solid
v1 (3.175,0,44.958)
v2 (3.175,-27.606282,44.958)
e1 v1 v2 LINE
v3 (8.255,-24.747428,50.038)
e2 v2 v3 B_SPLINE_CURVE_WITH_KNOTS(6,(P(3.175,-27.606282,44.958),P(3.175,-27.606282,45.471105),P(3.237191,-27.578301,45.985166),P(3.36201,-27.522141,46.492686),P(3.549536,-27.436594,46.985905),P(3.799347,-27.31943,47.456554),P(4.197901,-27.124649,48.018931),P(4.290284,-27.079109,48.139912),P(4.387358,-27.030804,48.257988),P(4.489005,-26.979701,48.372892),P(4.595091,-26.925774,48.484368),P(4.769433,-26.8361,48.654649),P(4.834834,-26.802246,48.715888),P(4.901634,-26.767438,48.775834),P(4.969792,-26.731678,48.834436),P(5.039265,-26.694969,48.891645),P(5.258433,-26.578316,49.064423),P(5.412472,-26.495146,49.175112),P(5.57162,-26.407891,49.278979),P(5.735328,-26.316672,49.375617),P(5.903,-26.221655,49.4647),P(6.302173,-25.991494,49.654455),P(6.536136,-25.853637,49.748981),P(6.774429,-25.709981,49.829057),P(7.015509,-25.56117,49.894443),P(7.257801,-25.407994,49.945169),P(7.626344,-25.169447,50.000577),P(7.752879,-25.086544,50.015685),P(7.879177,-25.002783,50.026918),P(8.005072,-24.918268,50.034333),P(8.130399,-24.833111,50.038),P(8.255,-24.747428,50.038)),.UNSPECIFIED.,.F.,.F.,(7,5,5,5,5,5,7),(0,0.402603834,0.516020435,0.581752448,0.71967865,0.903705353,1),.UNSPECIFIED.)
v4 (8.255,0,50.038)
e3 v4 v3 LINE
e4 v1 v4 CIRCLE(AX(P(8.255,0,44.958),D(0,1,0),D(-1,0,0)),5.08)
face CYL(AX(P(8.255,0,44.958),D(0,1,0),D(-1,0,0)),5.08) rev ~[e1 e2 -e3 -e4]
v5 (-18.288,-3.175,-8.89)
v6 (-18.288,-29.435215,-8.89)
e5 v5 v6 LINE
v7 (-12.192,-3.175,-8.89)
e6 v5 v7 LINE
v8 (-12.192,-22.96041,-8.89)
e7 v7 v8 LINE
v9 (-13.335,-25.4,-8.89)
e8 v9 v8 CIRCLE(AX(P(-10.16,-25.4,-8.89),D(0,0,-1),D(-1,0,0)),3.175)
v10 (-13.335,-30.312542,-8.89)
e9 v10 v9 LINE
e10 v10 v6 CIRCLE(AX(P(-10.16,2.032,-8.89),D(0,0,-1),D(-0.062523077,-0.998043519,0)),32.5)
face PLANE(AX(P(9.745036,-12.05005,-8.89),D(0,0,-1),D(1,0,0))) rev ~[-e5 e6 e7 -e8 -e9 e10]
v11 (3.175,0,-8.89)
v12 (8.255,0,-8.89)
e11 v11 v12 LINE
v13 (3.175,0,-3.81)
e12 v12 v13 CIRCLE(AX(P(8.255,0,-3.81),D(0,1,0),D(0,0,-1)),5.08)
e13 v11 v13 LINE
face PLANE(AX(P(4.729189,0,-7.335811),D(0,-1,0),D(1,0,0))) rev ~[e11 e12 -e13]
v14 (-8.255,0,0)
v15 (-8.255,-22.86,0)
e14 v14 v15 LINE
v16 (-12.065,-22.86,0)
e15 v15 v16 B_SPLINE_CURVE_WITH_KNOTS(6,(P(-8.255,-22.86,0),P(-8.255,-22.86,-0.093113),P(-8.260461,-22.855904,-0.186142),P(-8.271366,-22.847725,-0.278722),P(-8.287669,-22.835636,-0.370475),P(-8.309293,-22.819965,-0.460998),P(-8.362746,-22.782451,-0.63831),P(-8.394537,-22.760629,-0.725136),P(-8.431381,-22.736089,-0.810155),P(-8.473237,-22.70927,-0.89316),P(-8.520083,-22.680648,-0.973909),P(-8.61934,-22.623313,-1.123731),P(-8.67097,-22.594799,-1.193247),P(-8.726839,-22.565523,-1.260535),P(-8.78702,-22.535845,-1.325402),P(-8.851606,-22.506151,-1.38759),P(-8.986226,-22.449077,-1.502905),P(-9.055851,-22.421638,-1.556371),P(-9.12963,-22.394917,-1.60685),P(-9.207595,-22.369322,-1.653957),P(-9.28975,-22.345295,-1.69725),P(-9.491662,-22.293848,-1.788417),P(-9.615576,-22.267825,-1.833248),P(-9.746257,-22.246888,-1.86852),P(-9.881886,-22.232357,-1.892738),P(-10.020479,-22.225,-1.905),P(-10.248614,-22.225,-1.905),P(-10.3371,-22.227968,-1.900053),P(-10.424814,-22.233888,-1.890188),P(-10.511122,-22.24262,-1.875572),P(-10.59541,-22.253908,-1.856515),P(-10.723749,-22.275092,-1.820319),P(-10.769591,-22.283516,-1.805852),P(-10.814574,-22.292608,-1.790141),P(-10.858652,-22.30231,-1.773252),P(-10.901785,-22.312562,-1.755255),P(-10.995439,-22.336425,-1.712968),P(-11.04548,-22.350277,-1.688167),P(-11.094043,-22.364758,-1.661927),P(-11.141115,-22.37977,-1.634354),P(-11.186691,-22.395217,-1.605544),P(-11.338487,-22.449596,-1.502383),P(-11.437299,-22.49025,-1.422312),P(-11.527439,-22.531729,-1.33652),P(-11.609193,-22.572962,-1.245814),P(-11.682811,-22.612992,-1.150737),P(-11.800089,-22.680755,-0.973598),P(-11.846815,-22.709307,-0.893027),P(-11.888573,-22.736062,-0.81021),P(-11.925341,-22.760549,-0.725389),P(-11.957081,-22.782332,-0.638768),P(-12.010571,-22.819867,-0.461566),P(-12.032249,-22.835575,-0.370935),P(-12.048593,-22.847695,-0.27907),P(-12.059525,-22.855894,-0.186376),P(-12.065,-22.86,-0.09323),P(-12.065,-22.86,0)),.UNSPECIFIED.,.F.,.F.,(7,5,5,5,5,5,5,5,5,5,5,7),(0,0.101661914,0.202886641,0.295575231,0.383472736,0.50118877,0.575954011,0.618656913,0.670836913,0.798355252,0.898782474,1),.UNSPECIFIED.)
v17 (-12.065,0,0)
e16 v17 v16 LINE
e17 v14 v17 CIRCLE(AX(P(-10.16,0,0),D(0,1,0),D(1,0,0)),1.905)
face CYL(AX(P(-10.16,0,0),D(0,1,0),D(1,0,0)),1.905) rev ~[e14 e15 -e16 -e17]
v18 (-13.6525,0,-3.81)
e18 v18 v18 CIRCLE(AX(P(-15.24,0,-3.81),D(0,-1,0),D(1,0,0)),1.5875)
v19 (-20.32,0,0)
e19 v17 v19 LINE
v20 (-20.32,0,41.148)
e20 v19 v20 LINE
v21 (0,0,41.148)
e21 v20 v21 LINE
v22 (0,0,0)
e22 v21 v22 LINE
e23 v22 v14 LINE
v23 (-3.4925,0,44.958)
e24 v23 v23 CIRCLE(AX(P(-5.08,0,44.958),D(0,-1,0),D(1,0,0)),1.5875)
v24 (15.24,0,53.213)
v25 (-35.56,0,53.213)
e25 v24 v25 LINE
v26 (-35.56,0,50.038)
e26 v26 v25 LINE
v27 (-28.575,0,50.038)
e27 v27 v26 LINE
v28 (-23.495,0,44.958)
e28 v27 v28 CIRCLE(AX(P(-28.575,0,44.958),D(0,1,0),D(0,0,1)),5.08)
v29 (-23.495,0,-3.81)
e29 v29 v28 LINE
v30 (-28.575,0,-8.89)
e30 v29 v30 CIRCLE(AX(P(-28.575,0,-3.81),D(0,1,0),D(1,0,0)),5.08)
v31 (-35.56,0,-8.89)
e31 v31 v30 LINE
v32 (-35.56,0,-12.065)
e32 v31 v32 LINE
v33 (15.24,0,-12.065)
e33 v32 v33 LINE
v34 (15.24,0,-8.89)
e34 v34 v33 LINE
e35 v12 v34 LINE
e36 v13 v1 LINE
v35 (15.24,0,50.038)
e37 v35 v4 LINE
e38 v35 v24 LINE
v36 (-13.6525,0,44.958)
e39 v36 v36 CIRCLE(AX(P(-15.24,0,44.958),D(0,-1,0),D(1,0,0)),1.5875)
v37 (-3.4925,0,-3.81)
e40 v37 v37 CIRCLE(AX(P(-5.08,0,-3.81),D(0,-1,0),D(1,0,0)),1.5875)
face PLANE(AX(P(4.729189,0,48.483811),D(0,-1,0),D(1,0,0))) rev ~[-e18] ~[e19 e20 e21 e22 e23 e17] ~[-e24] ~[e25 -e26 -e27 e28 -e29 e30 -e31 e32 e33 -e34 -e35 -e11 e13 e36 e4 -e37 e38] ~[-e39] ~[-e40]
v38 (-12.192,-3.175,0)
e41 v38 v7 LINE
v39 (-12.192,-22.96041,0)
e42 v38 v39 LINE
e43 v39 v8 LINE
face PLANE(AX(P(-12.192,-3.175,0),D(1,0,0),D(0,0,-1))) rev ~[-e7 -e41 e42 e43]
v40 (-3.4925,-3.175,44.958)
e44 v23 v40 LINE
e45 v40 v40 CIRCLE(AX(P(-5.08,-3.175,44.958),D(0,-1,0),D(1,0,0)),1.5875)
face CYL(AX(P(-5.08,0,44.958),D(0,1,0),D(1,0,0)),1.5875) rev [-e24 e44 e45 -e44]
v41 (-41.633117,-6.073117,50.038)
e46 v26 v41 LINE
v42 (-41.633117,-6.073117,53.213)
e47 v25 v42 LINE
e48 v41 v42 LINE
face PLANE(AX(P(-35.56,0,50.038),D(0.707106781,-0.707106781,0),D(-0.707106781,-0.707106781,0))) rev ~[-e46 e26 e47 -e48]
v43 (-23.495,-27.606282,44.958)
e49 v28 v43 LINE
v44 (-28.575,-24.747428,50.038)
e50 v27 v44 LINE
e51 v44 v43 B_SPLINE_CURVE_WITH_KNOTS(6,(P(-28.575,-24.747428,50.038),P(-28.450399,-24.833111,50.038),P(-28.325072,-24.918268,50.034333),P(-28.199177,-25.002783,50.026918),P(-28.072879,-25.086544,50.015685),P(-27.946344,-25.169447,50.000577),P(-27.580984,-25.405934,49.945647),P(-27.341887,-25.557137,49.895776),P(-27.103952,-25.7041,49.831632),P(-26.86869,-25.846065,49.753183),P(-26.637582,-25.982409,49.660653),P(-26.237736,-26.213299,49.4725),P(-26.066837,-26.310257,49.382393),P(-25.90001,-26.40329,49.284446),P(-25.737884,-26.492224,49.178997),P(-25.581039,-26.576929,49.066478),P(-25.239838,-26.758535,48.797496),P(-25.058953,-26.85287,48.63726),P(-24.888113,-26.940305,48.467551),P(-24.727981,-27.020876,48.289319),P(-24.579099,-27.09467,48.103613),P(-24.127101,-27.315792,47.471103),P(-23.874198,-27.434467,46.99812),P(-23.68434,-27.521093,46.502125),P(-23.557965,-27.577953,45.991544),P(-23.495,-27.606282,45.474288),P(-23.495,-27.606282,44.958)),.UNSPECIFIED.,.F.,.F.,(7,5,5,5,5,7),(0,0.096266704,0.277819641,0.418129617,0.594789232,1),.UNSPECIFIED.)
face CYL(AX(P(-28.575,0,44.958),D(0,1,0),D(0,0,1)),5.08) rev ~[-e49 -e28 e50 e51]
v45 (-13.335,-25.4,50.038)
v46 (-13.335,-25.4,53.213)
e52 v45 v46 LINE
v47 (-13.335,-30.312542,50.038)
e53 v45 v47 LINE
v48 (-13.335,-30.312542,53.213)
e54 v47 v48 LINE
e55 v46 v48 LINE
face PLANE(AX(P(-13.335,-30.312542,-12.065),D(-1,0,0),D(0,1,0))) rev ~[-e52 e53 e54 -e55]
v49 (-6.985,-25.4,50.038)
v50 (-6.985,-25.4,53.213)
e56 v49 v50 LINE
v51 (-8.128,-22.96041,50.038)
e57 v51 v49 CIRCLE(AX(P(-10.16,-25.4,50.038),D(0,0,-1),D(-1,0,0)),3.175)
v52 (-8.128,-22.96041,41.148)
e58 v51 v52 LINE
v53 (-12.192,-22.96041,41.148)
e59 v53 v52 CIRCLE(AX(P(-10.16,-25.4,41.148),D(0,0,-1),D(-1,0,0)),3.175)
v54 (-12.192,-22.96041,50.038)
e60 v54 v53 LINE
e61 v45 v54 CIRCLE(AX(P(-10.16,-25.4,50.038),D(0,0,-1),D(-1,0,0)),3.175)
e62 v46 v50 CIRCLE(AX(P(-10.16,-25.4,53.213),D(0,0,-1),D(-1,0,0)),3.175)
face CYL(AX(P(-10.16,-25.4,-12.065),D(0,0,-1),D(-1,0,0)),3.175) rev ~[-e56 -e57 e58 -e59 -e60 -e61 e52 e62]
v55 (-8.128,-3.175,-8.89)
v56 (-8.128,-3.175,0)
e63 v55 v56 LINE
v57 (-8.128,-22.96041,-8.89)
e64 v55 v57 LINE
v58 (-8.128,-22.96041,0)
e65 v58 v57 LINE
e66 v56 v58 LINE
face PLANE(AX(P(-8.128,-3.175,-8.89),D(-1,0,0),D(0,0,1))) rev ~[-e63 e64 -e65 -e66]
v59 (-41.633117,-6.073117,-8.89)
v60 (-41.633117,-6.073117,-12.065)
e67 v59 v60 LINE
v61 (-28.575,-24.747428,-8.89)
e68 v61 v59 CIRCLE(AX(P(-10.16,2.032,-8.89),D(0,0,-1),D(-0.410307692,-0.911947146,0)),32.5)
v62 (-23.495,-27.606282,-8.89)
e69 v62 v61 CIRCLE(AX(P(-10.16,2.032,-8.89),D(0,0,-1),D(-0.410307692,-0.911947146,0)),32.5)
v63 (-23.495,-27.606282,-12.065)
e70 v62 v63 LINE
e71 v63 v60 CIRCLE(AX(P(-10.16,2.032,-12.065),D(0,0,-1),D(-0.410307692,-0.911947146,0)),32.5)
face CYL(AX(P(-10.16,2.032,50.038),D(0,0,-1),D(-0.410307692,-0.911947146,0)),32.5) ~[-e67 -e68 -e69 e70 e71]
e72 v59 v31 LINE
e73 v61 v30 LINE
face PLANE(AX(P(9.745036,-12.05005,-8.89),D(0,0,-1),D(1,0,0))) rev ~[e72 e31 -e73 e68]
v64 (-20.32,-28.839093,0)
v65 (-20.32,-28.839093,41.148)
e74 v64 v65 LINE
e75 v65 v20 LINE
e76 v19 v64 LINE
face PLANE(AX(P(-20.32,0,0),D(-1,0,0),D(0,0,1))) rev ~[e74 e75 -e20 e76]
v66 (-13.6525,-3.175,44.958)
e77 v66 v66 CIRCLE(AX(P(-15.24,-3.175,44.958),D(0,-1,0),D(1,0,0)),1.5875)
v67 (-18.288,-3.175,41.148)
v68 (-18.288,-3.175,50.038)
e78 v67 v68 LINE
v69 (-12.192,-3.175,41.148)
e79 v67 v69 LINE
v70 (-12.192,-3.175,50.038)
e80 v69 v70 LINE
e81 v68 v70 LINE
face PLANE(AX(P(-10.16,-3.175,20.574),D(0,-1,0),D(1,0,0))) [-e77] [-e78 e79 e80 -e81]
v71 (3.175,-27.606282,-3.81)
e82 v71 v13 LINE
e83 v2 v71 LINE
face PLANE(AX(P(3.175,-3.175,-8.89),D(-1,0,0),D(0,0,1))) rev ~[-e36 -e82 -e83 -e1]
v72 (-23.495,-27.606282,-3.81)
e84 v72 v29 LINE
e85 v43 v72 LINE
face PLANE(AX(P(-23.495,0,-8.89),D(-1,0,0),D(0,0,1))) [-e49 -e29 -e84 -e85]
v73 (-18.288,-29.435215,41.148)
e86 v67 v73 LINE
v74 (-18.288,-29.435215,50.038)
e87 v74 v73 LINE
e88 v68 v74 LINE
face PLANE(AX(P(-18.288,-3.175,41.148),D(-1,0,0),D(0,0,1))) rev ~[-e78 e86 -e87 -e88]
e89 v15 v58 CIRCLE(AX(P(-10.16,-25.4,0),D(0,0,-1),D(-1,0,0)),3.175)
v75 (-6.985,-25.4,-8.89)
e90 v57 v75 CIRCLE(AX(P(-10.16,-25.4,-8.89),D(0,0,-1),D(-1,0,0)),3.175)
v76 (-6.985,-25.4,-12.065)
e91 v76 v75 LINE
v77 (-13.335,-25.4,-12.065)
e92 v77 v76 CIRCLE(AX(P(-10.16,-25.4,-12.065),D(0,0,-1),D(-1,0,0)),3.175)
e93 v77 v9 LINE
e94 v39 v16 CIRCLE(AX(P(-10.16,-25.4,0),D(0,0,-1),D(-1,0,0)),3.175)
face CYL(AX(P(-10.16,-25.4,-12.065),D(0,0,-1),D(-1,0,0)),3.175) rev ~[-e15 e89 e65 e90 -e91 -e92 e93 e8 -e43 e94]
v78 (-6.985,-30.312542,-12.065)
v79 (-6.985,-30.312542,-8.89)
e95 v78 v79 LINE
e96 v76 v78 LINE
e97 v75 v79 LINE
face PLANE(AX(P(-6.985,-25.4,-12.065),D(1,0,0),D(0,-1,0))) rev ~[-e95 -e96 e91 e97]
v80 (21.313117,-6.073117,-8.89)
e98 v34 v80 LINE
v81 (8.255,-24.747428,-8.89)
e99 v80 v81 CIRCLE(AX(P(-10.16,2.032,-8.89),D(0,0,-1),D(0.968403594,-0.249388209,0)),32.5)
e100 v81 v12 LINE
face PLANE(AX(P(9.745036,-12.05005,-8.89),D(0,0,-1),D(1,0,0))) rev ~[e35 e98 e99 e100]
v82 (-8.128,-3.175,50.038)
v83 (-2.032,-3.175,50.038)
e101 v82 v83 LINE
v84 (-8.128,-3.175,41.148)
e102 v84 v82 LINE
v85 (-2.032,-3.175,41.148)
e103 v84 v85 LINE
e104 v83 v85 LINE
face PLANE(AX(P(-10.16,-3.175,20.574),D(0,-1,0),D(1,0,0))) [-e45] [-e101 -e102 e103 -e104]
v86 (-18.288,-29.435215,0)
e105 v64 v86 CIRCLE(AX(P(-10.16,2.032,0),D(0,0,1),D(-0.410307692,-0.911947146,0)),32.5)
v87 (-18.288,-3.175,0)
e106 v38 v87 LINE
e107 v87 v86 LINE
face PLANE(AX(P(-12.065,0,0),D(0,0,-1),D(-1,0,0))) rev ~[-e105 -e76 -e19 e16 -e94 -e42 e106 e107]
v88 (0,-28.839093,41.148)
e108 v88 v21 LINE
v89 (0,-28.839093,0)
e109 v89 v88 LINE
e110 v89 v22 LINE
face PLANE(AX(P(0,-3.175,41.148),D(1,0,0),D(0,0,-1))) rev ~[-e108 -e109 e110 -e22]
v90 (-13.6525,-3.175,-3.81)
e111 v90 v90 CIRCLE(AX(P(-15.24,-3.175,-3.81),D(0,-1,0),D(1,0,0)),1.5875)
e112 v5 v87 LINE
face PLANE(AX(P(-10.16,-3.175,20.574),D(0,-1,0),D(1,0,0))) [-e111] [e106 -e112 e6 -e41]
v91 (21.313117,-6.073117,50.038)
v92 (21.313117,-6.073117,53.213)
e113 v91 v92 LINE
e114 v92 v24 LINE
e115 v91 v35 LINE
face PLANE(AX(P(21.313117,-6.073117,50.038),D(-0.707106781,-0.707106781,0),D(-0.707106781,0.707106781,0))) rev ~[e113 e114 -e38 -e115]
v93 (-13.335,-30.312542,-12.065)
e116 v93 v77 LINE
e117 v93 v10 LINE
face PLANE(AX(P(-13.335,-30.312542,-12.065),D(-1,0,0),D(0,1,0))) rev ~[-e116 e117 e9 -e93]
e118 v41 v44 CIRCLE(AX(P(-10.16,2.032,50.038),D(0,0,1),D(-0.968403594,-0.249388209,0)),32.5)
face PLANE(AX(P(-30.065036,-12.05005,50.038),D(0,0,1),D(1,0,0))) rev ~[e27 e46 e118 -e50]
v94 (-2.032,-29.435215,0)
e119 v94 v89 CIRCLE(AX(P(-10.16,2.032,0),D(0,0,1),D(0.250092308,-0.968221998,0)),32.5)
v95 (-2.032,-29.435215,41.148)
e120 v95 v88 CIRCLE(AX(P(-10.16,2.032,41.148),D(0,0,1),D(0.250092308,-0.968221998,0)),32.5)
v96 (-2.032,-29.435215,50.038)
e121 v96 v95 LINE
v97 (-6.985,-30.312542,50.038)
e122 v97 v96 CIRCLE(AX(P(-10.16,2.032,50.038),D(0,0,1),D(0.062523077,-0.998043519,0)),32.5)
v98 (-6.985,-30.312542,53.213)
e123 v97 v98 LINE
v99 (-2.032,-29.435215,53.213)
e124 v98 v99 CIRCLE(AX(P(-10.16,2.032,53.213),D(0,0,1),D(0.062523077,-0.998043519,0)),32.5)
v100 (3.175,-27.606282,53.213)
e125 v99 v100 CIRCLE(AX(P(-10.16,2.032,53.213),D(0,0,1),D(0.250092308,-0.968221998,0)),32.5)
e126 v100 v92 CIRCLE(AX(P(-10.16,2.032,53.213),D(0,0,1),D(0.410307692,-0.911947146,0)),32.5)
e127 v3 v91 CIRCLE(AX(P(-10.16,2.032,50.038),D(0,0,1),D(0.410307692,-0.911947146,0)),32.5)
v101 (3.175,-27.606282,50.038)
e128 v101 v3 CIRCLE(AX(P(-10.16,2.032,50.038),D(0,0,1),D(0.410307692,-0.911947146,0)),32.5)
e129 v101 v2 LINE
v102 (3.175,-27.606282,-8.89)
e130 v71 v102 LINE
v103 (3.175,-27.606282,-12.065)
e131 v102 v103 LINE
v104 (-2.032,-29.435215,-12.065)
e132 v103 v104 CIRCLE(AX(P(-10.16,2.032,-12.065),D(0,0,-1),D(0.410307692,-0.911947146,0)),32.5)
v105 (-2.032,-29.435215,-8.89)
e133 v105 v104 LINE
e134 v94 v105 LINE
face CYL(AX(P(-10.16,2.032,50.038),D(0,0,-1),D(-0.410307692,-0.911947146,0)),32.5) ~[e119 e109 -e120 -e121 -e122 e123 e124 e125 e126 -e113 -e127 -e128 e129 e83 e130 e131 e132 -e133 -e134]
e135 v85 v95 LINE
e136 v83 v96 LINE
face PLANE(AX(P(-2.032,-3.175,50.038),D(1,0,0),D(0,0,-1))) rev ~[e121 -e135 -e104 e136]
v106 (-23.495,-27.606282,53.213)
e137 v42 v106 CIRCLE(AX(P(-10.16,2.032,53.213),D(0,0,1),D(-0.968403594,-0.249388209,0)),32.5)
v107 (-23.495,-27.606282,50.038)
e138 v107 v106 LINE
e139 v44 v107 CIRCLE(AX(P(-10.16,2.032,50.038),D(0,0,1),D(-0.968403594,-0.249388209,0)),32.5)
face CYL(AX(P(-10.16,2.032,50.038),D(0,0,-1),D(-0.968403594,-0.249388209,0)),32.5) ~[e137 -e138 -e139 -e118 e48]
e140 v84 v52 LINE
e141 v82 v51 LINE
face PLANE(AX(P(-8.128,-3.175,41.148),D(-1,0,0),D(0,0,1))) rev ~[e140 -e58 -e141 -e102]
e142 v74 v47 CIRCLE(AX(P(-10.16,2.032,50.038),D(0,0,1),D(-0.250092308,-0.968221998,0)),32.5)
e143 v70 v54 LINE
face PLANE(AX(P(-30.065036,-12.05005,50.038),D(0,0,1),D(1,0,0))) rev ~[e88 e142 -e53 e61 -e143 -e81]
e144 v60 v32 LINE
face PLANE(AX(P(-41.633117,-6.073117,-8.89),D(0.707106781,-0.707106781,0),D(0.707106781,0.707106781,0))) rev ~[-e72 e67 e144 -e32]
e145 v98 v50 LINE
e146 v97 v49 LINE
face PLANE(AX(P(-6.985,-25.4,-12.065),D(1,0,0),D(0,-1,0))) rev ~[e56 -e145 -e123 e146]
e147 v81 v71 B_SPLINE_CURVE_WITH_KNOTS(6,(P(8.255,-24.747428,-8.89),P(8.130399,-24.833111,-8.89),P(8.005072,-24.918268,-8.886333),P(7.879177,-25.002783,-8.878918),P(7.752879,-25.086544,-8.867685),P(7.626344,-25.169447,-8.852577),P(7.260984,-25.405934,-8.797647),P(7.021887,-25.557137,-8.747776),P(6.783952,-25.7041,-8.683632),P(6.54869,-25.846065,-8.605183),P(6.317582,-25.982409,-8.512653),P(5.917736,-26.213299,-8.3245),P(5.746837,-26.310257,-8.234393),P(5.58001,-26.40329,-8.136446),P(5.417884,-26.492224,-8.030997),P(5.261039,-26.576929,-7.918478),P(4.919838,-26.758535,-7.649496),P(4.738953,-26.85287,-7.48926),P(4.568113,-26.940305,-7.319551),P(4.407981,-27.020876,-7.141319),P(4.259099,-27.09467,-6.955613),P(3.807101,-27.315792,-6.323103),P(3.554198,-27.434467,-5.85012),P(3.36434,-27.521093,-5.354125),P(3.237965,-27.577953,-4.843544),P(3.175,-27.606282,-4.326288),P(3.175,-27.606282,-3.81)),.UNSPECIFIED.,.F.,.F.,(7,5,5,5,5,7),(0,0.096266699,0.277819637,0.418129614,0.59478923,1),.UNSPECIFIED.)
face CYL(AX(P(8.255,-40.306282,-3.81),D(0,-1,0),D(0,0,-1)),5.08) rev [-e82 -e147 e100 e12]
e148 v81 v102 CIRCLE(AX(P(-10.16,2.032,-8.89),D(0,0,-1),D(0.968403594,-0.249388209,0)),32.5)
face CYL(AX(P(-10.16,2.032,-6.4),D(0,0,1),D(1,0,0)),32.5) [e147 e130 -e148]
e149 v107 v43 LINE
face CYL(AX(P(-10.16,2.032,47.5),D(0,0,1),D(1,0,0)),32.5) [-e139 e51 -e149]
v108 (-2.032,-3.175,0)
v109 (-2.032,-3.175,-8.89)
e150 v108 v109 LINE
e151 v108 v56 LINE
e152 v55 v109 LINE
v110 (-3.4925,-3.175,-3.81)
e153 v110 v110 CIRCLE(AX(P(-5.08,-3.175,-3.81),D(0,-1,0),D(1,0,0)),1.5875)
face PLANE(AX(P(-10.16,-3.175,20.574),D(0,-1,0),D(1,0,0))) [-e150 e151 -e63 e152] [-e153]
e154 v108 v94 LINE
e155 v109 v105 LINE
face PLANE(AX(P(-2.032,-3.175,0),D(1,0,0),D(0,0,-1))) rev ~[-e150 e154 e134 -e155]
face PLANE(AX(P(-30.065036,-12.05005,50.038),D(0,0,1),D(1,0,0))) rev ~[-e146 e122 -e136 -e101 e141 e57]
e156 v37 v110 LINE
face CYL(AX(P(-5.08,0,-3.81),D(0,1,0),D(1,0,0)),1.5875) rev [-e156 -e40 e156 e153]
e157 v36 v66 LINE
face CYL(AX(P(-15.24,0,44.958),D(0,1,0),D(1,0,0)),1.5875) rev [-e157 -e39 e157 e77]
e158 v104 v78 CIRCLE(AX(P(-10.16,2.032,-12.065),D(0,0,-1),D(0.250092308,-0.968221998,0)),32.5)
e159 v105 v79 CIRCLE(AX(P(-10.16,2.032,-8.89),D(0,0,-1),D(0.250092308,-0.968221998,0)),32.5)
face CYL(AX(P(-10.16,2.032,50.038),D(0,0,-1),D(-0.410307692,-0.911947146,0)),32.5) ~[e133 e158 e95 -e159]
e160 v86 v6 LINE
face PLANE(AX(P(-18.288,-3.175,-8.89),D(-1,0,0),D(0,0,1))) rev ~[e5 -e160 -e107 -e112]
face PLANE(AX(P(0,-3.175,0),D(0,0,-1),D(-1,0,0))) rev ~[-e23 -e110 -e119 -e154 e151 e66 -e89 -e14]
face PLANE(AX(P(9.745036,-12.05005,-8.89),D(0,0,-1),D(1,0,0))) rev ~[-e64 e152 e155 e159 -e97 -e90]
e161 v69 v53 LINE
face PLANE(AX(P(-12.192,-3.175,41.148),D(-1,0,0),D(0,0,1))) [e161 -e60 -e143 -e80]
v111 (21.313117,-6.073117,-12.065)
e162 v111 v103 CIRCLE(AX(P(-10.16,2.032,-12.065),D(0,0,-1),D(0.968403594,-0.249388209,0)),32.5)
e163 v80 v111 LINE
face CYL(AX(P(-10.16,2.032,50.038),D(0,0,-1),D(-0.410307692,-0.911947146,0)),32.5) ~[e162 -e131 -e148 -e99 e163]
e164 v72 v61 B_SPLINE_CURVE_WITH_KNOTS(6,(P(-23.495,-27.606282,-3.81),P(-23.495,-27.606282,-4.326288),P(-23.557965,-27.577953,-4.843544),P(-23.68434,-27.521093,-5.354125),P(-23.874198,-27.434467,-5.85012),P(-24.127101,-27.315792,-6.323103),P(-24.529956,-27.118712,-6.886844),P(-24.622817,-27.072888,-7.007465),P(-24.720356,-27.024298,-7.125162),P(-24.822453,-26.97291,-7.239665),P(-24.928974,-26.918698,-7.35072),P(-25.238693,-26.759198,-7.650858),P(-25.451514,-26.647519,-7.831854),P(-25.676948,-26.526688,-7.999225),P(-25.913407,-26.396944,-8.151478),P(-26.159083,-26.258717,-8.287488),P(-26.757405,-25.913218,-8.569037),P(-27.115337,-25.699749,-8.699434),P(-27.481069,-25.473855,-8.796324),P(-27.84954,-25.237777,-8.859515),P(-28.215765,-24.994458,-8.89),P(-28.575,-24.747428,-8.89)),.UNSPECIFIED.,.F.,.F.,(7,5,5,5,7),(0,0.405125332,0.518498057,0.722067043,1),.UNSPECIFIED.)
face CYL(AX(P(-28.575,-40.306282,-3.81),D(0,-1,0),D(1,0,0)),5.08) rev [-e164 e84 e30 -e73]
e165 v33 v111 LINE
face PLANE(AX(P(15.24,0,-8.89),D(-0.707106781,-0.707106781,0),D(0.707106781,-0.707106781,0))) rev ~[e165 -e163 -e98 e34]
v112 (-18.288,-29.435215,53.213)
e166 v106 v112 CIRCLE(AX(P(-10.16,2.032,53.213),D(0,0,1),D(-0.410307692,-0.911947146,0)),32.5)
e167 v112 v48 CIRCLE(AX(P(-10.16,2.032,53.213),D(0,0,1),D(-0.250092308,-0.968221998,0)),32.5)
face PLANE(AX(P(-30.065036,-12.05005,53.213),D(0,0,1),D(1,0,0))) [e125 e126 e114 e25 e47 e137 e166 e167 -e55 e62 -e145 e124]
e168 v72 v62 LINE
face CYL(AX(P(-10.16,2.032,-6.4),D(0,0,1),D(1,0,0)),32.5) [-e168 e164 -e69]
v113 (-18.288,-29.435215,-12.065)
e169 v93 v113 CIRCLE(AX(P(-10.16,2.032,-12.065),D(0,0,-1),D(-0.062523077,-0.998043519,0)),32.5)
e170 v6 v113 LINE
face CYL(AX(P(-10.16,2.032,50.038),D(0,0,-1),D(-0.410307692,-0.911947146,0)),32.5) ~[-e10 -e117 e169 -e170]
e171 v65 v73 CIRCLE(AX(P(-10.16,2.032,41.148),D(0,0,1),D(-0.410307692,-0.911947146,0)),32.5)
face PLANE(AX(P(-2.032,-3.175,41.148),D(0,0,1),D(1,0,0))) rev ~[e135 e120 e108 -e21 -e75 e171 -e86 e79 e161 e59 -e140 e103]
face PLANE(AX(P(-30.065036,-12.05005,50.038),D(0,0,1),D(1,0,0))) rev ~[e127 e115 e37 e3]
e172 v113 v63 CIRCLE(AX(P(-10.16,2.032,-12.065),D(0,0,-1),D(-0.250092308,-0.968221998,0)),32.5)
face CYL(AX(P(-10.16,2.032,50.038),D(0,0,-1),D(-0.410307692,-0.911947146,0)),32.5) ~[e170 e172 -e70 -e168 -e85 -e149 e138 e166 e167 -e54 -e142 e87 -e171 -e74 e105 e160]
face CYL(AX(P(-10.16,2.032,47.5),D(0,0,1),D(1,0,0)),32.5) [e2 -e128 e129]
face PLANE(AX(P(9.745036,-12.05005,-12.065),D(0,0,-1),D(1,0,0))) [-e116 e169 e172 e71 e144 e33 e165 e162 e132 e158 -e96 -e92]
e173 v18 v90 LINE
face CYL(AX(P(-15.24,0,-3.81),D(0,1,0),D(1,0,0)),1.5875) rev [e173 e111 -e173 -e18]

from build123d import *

# Parameters (mm, degrees)
F0_W          = 26.67
F0_H          = 58.928
F0_R          = 1.5875
F1_DEPTH      = 3.175
F2_W          = 4.064
F2_H          = 8.89
F3_DEPTH      = 38.1
F5_DEPTH      = 101.6
F7_DEPTH      = 3.175
F9_DEPTH      = 3.175
F11_DEPTH     = 127
F12_T4_DEPTH  = 40.3062822545
F12_S5_R      = 32.5
F12_T6_DEPTH  = 22
F12_T10_DEPTH = 40.3062822545
F12_S11_R     = 32.5
F12_T12_DEPTH = 22
F12_T16_DEPTH = 40.3062822545
F12_S17_R     = 32.5
F12_T18_DEPTH = 22
F12_T22_DEPTH = 40.3062822545
F12_S23_R     = 32.5
F12_T24_DEPTH = 22


# Not quite as in the source:
# - a fillet or chamfer that OpenCascade refuses, or shapes differently, is made with other operations: its cross-section is extruded or revolved along the edge and cut away or added
# - after a boolean that leaves OpenCascade's solid faulty, fix() repairs it


with BuildPart() as f1:
    # F0 (on Front) → F1 (new body)
    with BuildSketch(Plane.XZ):
        with Locations((-10.16, 20.574)):
            Rectangle(F0_W, F0_H)
        with Locations((-15.24, -3.81)):
            Circle(F0_R, mode=Mode.SUBTRACT)
        with BuildLine():
            Line((0, 41.148), (0, 0))
            Line((0, 0), (-8.255, 0))
            ThreePointArc((-8.255, 0), (-10.16, -1.905), (-12.065, 0))
            Line((-12.065, 0), (-20.32, 0))
            Line((-20.32, 0), (-20.32, 41.148))
            Line((-20.32, 41.148), (0, 41.148))
        make_face(mode=Mode.SUBTRACT)
        with Locations((-5.08, -3.81)):
            Circle(F0_R, mode=Mode.SUBTRACT)
        with Locations((-15.24, 44.958)):
            Circle(F0_R, mode=Mode.SUBTRACT)
        with Locations((-5.08, 44.958)):
            Circle(F0_R, mode=Mode.SUBTRACT)
    extrude(amount=F1_DEPTH)

    # F2 (on face) → F3 (join)
    with BuildSketch(Plane.XZ.offset(3.175)):
        Polygon((0, 0), (-2.032, 0), (-2.032, -8.89), (3.175, -8.89), (3.175, 50.038), (-2.032, 50.038), (-2.032, 41.148), (0, 41.148), align=None)
        with BuildLine():
            Line((-8.128, -8.89), (-8.128, 0))
            Line((-8.128, 0), (-8.255, 0))
            ThreePointArc((-8.255, 0), (-10.16, -1.905), (-12.065, 0))
            Line((-12.065, 0), (-12.192, 0))
            Line((-12.192, 0), (-12.192, -8.89))
            Line((-12.192, -8.89), (-8.128, -8.89))
        make_face()
        Polygon((-23.495, -8.89), (-18.288, -8.89), (-18.288, 0), (-20.32, 0), (-20.32, 41.148), (-18.288, 41.148), (-18.288, 50.038), (-23.495, 50.038), align=None)
        with Locations((-10.16, 45.593)):
            Rectangle(F2_W, F2_H)
    extrude(amount=F3_DEPTH)

    # F4 (on face) → F5 (intersect)
    with BuildSketch(Plane.XY.offset(50.038)):
        with BuildLine():
            Line((-23.495, 0), (-23.495, -27.6062822545))
            ThreePointArc((-23.495, -27.6062822545), (-20.9303918657, -28.6314743475), (-18.288, -29.4352149387))
            Line((-18.288, -29.4352149387), (-18.288, -3.175))
            Line((-18.288, -3.175), (-12.192, -3.175))
            Line((-12.192, -3.175), (-12.192, -30.4044143518))
            ThreePointArc((-12.192, -30.4044143518), (-10.16, -30.468), (-8.128, -30.4044143518))
            Line((-8.128, -30.4044143518), (-8.128, -3.175))
            Line((-8.128, -3.175), (-2.032, -3.175))
            Line((-2.032, -3.175), (-2.032, -29.4352149387))
            ThreePointArc((-2.032, -29.4352149387), (0.6103918657, -28.6314743475), (3.175, -27.6062822545))
            Line((3.175, -27.6062822545), (3.175, 0))
            Line((3.175, 0), (-10.16, 0))
            Line((-10.16, 0), (-23.495, 0))
        make_face()
    extrude(amount=-F5_DEPTH, mode=Mode.INTERSECT)

    # F6 (on face) → F7 (join)
    with BuildSketch(Plane(origin=(0, 0, -8.89), x_dir=(1, 0, 0), z_dir=(0, 0, -1))):
        with BuildLine():
            Line((15.24, 0), (21.313116807, 6.073116807))
            ThreePointArc((21.313116807, 6.073116807), (14.6968126777, 18.9057377838), (3.175, 27.6062822545))
            Line((3.175, 27.6062822545), (3.175, 0))
            Line((3.175, 0), (15.24, 0))
        make_face()
        with BuildLine():
            Line((3.175, 0), (3.175, 27.6062822545))
            ThreePointArc((3.175, 27.6062822545), (0.6103918657, 28.6314743475), (-2.032, 29.4352149387))
            Line((-2.032, 29.4352149387), (-2.032, 3.175))
            Line((-2.032, 3.175), (-8.128, 3.175))
            Line((-8.128, 3.175), (-8.128, 30.4044143518))
            ThreePointArc((-8.128, 30.4044143518), (-10.16, 30.468), (-12.192, 30.4044143518))
            Line((-12.192, 30.4044143518), (-12.192, 3.175))
            Line((-12.192, 3.175), (-18.288, 3.175))
            Line((-18.288, 3.175), (-18.288, 29.4352149387))
            ThreePointArc((-18.288, 29.4352149387), (-20.9303918657, 28.6314743475), (-23.495, 27.6062822545))
            Line((-23.495, 27.6062822545), (-23.495, 0))
            Line((-23.495, 0), (-10.16, 0))
            Line((-10.16, 0), (3.175, 0))
        make_face()
        with BuildLine():
            Line((-2.032, 3.175), (-2.032, 29.4352149387))
            ThreePointArc((-2.032, 29.4352149387), (-5.0569384801, 30.0648653162), (-8.128, 30.4044143518))
            Line((-8.128, 30.4044143518), (-8.128, 3.175))
            Line((-8.128, 3.175), (-2.032, 3.175))
        make_face()
        with BuildLine():
            Line((-12.192, 3.175), (-12.192, 30.4044143518))
            ThreePointArc((-12.192, 30.4044143518), (-15.2630615199, 30.0648653162), (-18.288, 29.4352149387))
            Line((-18.288, 29.4352149387), (-18.288, 3.175))
            Line((-18.288, 3.175), (-12.192, 3.175))
        make_face()
        with BuildLine():
            Line((-35.56, 0), (-23.495, 0))
            Line((-23.495, 0), (-23.495, 27.6062822545))
            ThreePointArc((-23.495, 27.6062822545), (-35.0168126777, 18.9057377838), (-41.633116807, 6.073116807))
            Line((-41.633116807, 6.073116807), (-35.56, 0))
        make_face()
    extrude(amount=F7_DEPTH)

    add(f1.part.fix(), mode=Mode.REPLACE)

    # F8 (on face) → F9 (join)
    with BuildSketch(Plane.XY.offset(50.038)):
        with BuildLine():
            Line((-23.495, -27.6062822545), (-23.495, 0))
            Line((-23.495, 0), (-35.56, 0))
            Line((-35.56, 0), (-41.633116807, -6.073116807))
            ThreePointArc((-41.633116807, -6.073116807), (-35.0168126777, -18.9057377838), (-23.495, -27.6062822545))
        make_face()
        with BuildLine():
            Line((15.24, 0), (3.175, 0))
            Line((3.175, 0), (3.175, -27.6062822545))
            ThreePointArc((3.175, -27.6062822545), (14.6968126777, -18.9057377838), (21.313116807, -6.073116807))
            Line((21.313116807, -6.073116807), (15.24, 0))
        make_face()
        with BuildLine():
            Line((-18.288, -3.175), (-18.288, -29.4352149387))
            ThreePointArc((-18.288, -29.4352149387), (-15.2630615199, -30.0648653162), (-12.192, -30.4044143518))
            Line((-12.192, -30.4044143518), (-12.192, -3.175))
            Line((-12.192, -3.175), (-18.288, -3.175))
        make_face()
        with BuildLine():
            ThreePointArc((-8.128, -30.4044143518), (-5.0569384801, -30.0648653162), (-2.032, -29.4352149387))
            Line((-2.032, -29.4352149387), (-2.032, -3.175))
            Line((-2.032, -3.175), (-8.128, -3.175))
            Line((-8.128, -3.175), (-8.128, -30.4044143518))
        make_face()
        with BuildLine():
            Line((3.175, -27.6062822545), (3.175, 0))
            Line((3.175, 0), (-23.495, 0))
            Line((-23.495, 0), (-23.495, -27.6062822545))
            ThreePointArc((-23.495, -27.6062822545), (-20.9303918657, -28.6314743475), (-18.288, -29.4352149387))
            Line((-18.288, -29.4352149387), (-18.288, -3.175))
            Line((-18.288, -3.175), (-12.192, -3.175))
            Line((-12.192, -3.175), (-12.192, -30.4044143518))
            ThreePointArc((-12.192, -30.4044143518), (-10.16, -30.468), (-8.128, -30.4044143518))
            Line((-8.128, -30.4044143518), (-8.128, -3.175))
            Line((-8.128, -3.175), (-2.032, -3.175))
            Line((-2.032, -3.175), (-2.032, -29.4352149387))
            ThreePointArc((-2.032, -29.4352149387), (0.6103918657, -28.6314743475), (3.175, -27.6062822545))
        make_face()
    extrude(amount=F9_DEPTH)

    # F10 (on face) → F11 (cut)
    with BuildSketch(Plane(origin=(0, 0, -12.065), x_dir=(1, 0, 0), z_dir=(0, 0, -1))):
        with BuildLine():
            Line((-13.335, 30.312541657), (-13.335, 25.4))
            ThreePointArc((-13.335, 25.4), (-10.16, 22.225), (-6.985, 25.4))
            Line((-6.985, 25.4), (-6.985, 30.312541657))
            ThreePointArc((-6.985, 30.312541657), (-10.16, 30.468), (-13.335, 30.312541657))
        make_face()
    extrude(amount=-F11_DEPTH, mode=Mode.SUBTRACT)

    # F12: fillet of radius 5.08 on 4 edges, made by hand


with BuildPart() as f12_tool2:
    # F12_s3 → F12_t4 (new body)
    with BuildSketch(Plane.XZ.offset(40.3062822545)):
        with BuildLine():
            ThreePointArc((-23.495, -3.81), (-24.9828975516, -7.4021024484), (-28.575, -8.89))
            Line((-28.575, -8.89), (-23.495, -8.89))
            Line((-23.495, -8.89), (-23.495, -3.81))
        make_face()
    extrude(amount=-F12_T4_DEPTH)

    # F12_s5 → F12_t6 (intersect, symmetric)
    with BuildSketch(Plane.XY.offset(-6.4)):
        with Locations((-10.16, 2.032)):
            Circle(F12_S5_R)
    extrude(amount=F12_T6_DEPTH, both=True, mode=Mode.INTERSECT)


with BuildPart() as f1_1:
    add(f1.part)

    # F12_t1: union F12_tool2
    add(f12_tool2.part)


with BuildPart() as f12_tool8:
    # F12_s9 → F12_t10 (new body)
    with BuildSketch(Plane.XZ):
        with BuildLine():
            ThreePointArc((-28.575, 50.038), (-24.9828975516, 48.5501024484), (-23.495, 44.958))
            Line((-23.495, 44.958), (-23.495, 50.038))
            Line((-23.495, 50.038), (-28.575, 50.038))
        make_face()
    extrude(amount=F12_T10_DEPTH)

    # F12_s11 → F12_t12 (intersect, symmetric)
    with BuildSketch(Plane.XY.offset(47.5)):
        with Locations((-10.16, 2.032)):
            Circle(F12_S11_R)
    extrude(amount=F12_T12_DEPTH, both=True, mode=Mode.INTERSECT)


with BuildPart() as f1_2:
    add(f1_1.part)

    # F12_t7: union F12_tool8
    add(f12_tool8.part)


with BuildPart() as f12_tool14:
    # F12_s15 → F12_t16 (new body)
    with BuildSketch(Plane.XZ):
        with BuildLine():
            ThreePointArc((3.175, 44.958), (4.6628975516, 48.5501024484), (8.255, 50.038))
            Line((8.255, 50.038), (3.175, 50.038))
            Line((3.175, 50.038), (3.175, 44.958))
        make_face()
    extrude(amount=F12_T16_DEPTH)

    # F12_s17 → F12_t18 (intersect, symmetric)
    with BuildSketch(Plane.XY.offset(47.5)):
        with Locations((-10.16, 2.032)):
            Circle(F12_S17_R)
    extrude(amount=F12_T18_DEPTH, both=True, mode=Mode.INTERSECT)


with BuildPart() as f1_3:
    add(f1_2.part)

    # F12_t13: union F12_tool14
    add(f12_tool14.part)


with BuildPart() as f12_tool20:
    # F12_s21 → F12_t22 (new body)
    with BuildSketch(Plane.XZ.offset(40.3062822545)):
        with BuildLine():
            ThreePointArc((8.255, -8.89), (4.6628975516, -7.4021024484), (3.175, -3.81))
            Line((3.175, -3.81), (3.175, -8.89))
            Line((3.175, -8.89), (8.255, -8.89))
        make_face()
    extrude(amount=-F12_T22_DEPTH)

    # F12_s23 → F12_t24 (intersect, symmetric)
    with BuildSketch(Plane.XY.offset(-6.4)):
        with Locations((-10.16, 2.032)):
            Circle(F12_S23_R)
    extrude(amount=F12_T24_DEPTH, both=True, mode=Mode.INTERSECT)


with BuildPart() as f1_4:
    add(f1_3.part)

    # F12_t19: union F12_tool20
    add(f12_tool20.part)


solid = f1_4.part
